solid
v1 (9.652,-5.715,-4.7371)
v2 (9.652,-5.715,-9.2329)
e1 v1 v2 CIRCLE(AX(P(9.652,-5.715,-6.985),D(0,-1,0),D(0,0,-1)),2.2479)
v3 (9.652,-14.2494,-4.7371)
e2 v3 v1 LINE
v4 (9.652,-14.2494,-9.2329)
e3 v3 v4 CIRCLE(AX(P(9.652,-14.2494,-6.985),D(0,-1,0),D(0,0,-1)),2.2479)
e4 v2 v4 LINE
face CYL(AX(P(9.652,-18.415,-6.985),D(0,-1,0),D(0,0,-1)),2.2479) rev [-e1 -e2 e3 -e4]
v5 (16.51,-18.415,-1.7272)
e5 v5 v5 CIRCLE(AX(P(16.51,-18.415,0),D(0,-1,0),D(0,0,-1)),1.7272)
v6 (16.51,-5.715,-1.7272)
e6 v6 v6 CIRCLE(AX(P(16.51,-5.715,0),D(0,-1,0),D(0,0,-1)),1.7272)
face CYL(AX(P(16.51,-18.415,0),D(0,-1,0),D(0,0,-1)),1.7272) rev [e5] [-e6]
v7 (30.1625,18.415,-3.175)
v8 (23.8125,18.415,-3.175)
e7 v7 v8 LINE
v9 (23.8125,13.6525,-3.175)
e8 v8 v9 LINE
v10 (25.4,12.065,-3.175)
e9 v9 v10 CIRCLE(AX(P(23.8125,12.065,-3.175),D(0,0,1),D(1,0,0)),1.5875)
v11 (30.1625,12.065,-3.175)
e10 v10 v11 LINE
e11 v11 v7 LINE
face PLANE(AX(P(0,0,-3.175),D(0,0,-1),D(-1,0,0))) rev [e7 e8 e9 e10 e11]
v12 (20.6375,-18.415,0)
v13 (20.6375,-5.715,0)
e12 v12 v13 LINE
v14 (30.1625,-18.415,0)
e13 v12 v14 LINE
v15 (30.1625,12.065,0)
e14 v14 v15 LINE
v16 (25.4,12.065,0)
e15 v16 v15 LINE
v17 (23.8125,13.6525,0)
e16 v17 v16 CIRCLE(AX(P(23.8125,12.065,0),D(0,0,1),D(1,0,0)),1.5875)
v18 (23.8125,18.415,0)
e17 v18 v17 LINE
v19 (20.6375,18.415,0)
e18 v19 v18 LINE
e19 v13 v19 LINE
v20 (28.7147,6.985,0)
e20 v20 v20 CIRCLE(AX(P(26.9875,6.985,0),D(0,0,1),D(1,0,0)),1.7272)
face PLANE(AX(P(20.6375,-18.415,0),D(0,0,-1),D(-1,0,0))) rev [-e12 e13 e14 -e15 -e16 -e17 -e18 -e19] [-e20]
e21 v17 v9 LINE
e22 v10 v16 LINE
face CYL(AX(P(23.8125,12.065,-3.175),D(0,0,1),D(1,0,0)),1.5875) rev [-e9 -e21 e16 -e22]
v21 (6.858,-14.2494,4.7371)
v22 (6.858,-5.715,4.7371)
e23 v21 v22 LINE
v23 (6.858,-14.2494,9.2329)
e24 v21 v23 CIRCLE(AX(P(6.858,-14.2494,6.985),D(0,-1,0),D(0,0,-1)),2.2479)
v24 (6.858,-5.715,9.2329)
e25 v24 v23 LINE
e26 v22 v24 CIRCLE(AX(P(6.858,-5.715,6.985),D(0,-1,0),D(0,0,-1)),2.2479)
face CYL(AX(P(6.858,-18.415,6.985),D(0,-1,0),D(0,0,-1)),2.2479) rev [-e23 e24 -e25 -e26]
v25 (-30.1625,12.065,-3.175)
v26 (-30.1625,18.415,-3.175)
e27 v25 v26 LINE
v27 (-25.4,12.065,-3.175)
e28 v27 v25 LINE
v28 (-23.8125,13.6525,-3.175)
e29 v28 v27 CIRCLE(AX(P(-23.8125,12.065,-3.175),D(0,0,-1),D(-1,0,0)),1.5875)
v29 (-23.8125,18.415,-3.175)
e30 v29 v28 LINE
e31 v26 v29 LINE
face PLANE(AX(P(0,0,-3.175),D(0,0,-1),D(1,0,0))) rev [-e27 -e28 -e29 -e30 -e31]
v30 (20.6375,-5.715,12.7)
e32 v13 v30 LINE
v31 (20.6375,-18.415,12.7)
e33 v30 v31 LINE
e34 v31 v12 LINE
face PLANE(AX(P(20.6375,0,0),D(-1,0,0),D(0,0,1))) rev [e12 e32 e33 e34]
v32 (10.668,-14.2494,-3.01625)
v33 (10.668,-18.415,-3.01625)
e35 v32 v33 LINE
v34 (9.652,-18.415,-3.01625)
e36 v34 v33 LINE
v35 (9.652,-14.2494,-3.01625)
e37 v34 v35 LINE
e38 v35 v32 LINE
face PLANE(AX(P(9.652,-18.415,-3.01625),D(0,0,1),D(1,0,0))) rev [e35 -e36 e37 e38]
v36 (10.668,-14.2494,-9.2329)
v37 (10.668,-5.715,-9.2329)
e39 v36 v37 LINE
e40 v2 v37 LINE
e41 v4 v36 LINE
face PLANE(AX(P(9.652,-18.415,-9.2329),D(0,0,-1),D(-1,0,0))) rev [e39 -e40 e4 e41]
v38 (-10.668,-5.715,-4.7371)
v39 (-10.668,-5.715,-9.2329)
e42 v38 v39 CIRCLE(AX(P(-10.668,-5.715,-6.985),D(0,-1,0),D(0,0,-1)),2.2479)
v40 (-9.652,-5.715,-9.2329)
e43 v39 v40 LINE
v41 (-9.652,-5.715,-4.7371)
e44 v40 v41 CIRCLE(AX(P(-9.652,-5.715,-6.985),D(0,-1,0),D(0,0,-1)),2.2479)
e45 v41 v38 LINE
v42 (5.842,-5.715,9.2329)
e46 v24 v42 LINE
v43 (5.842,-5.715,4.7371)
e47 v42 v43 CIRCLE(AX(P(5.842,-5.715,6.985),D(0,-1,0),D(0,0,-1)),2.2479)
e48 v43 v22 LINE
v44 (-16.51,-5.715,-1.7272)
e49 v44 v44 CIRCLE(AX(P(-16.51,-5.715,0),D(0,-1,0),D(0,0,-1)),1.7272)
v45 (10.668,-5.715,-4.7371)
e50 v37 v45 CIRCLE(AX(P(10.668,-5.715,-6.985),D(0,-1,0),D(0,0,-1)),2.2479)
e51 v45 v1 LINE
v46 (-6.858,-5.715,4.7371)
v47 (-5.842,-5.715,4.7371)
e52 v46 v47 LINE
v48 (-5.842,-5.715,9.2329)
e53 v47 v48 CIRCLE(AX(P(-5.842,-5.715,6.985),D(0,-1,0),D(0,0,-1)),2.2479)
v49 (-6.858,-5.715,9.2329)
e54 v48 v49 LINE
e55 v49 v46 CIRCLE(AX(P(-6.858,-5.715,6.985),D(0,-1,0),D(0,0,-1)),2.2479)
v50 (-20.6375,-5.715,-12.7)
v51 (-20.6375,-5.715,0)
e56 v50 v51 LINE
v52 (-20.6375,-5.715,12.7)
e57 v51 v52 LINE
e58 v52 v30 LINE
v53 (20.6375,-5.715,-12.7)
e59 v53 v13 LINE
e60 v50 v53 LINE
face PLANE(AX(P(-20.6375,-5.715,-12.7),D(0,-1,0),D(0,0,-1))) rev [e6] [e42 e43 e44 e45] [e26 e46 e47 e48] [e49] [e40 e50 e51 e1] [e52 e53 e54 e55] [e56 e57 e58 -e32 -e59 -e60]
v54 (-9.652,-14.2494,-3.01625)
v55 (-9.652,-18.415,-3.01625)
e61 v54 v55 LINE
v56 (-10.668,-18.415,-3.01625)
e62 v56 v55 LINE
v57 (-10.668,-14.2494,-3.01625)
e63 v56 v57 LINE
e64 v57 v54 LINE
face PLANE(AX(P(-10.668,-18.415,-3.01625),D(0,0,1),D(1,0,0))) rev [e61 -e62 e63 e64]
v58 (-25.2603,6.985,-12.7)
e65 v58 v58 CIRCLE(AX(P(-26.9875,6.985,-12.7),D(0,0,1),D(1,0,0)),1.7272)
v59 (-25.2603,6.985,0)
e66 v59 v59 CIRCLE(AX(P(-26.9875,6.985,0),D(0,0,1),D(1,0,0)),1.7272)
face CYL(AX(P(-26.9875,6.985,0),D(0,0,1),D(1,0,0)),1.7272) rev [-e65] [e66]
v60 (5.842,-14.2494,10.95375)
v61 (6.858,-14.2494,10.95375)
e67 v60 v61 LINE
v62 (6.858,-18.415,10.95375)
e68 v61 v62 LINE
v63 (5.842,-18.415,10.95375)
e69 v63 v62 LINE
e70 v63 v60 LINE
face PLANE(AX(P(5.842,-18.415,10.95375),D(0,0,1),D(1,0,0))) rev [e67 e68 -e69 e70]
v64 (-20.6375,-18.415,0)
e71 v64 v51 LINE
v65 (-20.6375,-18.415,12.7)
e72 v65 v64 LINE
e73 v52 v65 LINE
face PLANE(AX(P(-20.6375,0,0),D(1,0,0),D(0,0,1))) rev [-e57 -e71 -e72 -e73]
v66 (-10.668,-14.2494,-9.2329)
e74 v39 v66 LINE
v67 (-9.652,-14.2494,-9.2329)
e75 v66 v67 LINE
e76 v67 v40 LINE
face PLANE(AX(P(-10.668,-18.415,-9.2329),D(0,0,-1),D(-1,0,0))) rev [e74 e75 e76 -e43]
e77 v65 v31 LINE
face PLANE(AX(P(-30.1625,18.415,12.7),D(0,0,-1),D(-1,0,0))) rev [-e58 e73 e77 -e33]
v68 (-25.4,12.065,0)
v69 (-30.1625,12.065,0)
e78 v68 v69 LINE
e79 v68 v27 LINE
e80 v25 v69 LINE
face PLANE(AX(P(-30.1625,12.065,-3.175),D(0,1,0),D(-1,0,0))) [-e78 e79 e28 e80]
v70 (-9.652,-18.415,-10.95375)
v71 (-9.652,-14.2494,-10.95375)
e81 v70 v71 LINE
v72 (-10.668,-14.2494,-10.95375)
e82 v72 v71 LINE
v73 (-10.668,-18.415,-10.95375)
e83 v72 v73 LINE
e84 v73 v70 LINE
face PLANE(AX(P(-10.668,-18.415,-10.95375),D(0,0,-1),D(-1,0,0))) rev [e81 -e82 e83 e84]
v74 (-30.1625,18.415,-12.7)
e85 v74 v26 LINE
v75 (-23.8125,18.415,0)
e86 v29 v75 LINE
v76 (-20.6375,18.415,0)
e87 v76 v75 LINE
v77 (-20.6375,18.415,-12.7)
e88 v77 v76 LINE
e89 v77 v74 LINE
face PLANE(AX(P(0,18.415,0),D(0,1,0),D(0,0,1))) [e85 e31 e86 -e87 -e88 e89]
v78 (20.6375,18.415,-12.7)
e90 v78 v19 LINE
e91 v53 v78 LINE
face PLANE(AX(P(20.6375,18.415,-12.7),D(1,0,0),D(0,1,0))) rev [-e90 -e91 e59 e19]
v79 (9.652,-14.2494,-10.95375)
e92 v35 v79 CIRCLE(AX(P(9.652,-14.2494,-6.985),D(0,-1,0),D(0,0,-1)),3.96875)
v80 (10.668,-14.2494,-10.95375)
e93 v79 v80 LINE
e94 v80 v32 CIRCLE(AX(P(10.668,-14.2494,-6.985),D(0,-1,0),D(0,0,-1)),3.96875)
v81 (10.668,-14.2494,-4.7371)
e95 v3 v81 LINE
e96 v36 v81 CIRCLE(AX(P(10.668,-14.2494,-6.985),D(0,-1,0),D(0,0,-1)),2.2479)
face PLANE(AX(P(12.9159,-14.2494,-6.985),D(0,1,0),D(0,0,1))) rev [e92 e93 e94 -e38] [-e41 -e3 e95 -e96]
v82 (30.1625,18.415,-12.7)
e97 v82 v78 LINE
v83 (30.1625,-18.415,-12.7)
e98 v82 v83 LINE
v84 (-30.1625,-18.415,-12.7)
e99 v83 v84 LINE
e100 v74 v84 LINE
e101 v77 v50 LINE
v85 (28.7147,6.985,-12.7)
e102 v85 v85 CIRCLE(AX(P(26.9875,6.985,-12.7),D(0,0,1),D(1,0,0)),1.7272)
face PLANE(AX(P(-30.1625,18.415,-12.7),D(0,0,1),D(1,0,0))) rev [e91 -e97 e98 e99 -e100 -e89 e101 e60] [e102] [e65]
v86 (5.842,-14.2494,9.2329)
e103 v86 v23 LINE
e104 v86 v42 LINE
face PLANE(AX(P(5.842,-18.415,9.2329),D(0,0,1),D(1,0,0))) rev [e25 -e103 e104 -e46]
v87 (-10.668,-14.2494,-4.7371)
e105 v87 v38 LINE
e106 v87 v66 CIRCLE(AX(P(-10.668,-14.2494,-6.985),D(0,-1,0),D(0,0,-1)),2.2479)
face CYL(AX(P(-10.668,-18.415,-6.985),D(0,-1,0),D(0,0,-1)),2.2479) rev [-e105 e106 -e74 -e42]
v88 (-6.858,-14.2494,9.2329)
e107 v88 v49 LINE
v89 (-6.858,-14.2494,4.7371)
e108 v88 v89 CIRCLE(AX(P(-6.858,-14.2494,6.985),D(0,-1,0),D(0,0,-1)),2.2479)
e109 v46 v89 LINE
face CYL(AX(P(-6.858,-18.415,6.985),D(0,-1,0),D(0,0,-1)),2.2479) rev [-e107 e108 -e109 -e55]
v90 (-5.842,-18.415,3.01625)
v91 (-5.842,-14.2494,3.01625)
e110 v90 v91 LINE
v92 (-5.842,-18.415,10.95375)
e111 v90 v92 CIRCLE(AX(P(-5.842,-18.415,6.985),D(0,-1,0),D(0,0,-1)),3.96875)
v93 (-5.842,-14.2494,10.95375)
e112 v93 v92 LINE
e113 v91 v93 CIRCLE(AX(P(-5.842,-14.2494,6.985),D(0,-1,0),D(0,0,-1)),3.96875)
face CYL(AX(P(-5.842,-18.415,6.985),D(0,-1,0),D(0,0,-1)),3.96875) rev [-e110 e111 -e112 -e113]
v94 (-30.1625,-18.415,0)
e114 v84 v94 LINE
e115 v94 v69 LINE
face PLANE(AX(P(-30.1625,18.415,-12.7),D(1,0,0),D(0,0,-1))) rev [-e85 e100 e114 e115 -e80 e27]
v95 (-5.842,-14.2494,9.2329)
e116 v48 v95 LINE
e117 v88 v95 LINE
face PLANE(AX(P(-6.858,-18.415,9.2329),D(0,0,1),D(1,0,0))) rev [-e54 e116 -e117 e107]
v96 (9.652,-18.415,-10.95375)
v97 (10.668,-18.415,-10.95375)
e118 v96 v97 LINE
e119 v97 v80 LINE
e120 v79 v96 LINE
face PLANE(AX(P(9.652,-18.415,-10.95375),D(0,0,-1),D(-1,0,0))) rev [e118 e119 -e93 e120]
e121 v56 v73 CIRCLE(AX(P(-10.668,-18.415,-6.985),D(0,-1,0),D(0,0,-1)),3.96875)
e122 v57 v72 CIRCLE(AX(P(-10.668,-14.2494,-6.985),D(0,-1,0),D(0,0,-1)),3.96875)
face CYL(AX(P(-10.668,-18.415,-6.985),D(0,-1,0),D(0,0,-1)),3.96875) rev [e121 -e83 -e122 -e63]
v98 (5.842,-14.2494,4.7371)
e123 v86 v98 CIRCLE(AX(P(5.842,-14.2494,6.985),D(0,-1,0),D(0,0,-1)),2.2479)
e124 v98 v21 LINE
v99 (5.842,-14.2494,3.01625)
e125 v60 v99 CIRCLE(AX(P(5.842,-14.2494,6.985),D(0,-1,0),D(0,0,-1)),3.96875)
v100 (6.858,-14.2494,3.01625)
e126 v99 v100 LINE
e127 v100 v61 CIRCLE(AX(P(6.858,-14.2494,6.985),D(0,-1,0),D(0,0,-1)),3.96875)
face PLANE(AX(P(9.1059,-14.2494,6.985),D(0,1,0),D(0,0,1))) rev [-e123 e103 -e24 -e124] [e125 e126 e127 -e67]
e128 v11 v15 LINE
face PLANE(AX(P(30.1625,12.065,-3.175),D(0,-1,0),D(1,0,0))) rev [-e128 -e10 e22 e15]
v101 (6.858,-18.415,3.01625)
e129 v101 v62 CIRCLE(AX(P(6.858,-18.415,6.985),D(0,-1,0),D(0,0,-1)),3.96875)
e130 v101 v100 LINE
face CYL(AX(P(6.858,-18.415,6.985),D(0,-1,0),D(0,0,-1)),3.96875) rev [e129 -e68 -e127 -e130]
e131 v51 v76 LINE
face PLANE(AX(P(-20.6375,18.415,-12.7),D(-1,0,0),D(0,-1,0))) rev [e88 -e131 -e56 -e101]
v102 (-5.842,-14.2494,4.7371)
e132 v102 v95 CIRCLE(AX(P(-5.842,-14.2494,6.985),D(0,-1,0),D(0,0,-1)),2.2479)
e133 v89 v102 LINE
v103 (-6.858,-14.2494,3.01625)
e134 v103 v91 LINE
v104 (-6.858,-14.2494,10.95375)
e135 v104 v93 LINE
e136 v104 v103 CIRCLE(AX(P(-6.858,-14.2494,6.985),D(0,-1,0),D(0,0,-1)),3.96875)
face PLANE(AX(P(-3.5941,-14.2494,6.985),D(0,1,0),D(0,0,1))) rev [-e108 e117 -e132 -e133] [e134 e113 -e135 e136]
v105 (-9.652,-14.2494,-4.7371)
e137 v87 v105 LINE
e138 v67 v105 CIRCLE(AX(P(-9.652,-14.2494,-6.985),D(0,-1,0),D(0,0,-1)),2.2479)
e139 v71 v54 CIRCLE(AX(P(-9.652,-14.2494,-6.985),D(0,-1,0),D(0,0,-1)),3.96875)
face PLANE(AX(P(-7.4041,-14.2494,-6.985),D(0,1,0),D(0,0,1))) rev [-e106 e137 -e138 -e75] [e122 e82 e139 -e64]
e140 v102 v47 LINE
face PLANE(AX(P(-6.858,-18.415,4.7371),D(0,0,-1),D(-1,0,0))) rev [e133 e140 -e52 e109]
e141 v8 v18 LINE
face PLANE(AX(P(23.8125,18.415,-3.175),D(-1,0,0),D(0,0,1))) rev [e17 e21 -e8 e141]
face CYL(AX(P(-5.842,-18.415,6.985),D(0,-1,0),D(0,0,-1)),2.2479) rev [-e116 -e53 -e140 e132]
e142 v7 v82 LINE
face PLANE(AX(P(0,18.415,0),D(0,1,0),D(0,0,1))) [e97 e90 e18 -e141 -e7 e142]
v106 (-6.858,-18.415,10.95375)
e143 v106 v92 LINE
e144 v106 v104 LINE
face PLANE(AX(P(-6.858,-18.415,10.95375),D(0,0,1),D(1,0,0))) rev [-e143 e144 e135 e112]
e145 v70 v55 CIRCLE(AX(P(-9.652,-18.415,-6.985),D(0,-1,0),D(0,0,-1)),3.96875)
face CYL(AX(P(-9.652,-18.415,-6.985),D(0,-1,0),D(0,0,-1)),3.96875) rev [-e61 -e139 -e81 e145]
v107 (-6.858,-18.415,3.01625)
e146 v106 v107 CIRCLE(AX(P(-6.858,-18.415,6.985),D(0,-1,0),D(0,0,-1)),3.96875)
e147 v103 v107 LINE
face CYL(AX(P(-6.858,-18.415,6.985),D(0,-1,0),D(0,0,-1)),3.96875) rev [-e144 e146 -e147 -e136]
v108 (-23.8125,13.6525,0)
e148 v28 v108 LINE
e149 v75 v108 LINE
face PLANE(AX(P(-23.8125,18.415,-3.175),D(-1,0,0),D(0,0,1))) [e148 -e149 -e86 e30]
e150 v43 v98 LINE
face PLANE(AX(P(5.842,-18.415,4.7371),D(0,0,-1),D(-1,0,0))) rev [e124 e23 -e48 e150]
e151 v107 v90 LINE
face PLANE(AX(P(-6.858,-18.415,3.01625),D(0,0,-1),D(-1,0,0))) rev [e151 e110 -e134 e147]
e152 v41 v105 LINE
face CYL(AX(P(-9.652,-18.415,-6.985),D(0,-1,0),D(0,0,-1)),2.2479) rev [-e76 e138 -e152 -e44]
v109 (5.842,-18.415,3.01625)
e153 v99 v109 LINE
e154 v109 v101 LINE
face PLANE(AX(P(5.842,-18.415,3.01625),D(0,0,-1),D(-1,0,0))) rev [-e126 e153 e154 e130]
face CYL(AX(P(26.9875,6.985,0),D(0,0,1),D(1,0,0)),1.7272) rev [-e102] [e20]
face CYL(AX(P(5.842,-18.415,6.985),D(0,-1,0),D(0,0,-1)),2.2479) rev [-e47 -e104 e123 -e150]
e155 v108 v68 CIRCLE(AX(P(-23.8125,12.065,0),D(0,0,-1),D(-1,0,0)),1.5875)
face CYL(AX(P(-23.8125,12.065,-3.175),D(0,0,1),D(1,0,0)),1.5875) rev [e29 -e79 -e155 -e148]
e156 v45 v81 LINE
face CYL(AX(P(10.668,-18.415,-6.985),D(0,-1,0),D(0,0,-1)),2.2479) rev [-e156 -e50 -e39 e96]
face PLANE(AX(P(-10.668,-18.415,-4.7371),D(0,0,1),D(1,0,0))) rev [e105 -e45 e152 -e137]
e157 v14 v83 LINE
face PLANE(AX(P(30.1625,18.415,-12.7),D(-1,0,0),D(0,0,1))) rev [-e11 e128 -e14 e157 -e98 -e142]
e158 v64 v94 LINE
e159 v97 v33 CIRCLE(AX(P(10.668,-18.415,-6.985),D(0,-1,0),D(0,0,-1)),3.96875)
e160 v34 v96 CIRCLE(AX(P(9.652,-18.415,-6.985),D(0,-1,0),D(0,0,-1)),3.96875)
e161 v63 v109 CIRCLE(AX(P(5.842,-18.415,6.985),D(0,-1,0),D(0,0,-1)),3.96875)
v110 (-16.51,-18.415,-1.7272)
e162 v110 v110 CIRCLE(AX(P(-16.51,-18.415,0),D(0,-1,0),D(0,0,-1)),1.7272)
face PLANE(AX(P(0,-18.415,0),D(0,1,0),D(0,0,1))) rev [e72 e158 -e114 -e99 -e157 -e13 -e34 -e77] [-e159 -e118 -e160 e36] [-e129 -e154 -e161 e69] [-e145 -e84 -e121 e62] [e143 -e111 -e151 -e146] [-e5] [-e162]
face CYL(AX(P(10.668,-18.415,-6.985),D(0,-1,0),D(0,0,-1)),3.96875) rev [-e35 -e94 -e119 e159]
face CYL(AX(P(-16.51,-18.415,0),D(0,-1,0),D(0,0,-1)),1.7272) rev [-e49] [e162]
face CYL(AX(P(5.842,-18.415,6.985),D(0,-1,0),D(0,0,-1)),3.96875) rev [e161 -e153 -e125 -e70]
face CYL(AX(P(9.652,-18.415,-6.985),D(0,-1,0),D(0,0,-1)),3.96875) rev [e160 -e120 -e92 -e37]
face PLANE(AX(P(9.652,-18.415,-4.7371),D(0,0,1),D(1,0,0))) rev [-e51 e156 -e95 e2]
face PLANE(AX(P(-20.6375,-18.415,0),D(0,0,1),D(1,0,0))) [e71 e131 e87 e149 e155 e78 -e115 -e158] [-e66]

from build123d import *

# Parameters (mm, degrees)
SKETCH1_W                                     = 60.325
SKETCH1_H                                     = 25.4
BOSS_EXTRUDE1_DEPTH                           = 18.415
SKETCH2_W                                     = 41.275
SKETCH2_H                                     = 24.13
CUT_EXTRUDE1_DEPTH                            = 44.520669012
SKETCH3_W                                     = 12.7
SKETCH3_H                                     = 36.83
CUT_EXTRUDE2_DEPTH                            = 9.525
SKETCH4_W                                     = 6.35
SKETCH4_H                                     = 6.35
CUT_EXTRUDE3_DEPTH                            = 3.175
SKETCH5_R                                     = 1.5875
CUT_EXTRUDE4_DEPTH                            = 3.175
F_8_32_TAPPED_HOLE1_D                         = 3.4544
F_8_32_TAPPED_HOLE2_D                         = 3.4544
CBORE_START                                   = -18.415
CBORE_SLOT_FOR_8_SOCKET_HEAD_CAP_SCREW1_DEPTH = 12.7
CBORE_SLOT_FOR_8_SOCKET_HEAD_CAP_SC_3_DEPTH   = 4.1656


# Read off the part's stored shape, not the designer's step: CBORE SLOT for #8 Socket Head Cap Screw1
with BuildPart() as part:
    # Sketch1 → Boss-Extrude1 (new, symmetric)
    with BuildSketch(Plane(origin=(0, 0, 0), x_dir=(1, 0, 0), z_dir=(0, 1, 0))):
        Rectangle(SKETCH1_W, SKETCH1_H)
    extrude(amount=BOSS_EXTRUDE1_DEPTH, both=True)

    # Sketch2 → Cut-Extrude1 (cut, through all)
    with BuildSketch(Plane.XY.offset(12.7)):
        with Locations((0, 6.35)):
            Rectangle(SKETCH2_W, SKETCH2_H)
    extrude(amount=-CUT_EXTRUDE1_DEPTH, mode=Mode.SUBTRACT)

    # Sketch3 → Cut-Extrude2 (cut)
    with BuildSketch(Plane(origin=(30.1625, 0, 0), x_dir=(0, 0, -1), z_dir=(1, 0, 0))):
        with Locations((-6.35, 0)):
            Rectangle(SKETCH3_W, SKETCH3_H)
    cut_extrude2 = extrude(amount=-CUT_EXTRUDE2_DEPTH, mode=Mode.SUBTRACT)

    # Sketch4 → Cut-Extrude3 (cut)
    with BuildSketch(Plane.XY):
        with Locations((26.9875, 15.24)):
            Rectangle(SKETCH4_W, SKETCH4_H)
    cut_extrude3 = extrude(amount=-CUT_EXTRUDE3_DEPTH, mode=Mode.SUBTRACT)

    # Sketch5 → Cut-Extrude4 (cut)
    with BuildSketch(Plane.XY):
        with Locations((23.8125, 12.065)):
            Circle(SKETCH5_R)
    cut_extrude4 = extrude(amount=-CUT_EXTRUDE4_DEPTH, mode=Mode.SUBTRACT)

    # #8-32 Tapped Hole1 (through all)
    with Locations(Plane.XY):
        with Locations((26.9875, 6.985)):
            f_8_32_tapped_hole1 = Hole(F_8_32_TAPPED_HOLE1_D / 2)

    # Mirror1: Cut-Extrude2, Cut-Extrude3, Cut-Extrude4, #8-32 Tapped Hole1 across plane
    add(cut_extrude2.mirror(Plane(origin=(0, 0, 0), x_dir=(0, 0, 1), z_dir=(1, 0, 0))), mode=Mode.SUBTRACT)
    add(cut_extrude3.mirror(Plane(origin=(0, 0, 0), x_dir=(0, 0, 1), z_dir=(1, 0, 0))), mode=Mode.SUBTRACT)
    add(cut_extrude4.mirror(Plane(origin=(0, 0, 0), x_dir=(0, 0, 1), z_dir=(1, 0, 0))), mode=Mode.SUBTRACT)
    add(f_8_32_tapped_hole1.mirror(Plane(origin=(0, 0, 0), x_dir=(0, 0, 1), z_dir=(1, 0, 0))), mode=Mode.SUBTRACT)

    # #8-32 Tapped Hole2 (through all)
    with Locations(Plane(origin=(0, -18.415, 0), x_dir=(-1, 0, 0), z_dir=(0, -1, 0))):
        with Locations((16.51, 0)):
            f_8_32_tapped_hole2 = Hole(F_8_32_TAPPED_HOLE2_D / 2)

    # CBORE SLOT for _8 Socket Head Cap Sc 2 → CBORE SLOT for #8 Socket Head Cap Screw1 (cut)
    with BuildSketch(Plane(origin=(0, 0, 0), x_dir=(1, 0, 0), z_dir=(0, 1, 0)).offset(CBORE_START)):
        with BuildLine():
            ThreePointArc((-9.652, 4.7371), (-7.4041, 6.985), (-9.652, 9.2329))
            Line((-9.652, 9.2329), (-10.668, 9.2329))
            ThreePointArc((-10.668, 9.2329), (-12.9159, 6.985), (-10.668, 4.7371))
            Line((-10.668, 4.7371), (-9.652, 4.7371))
        make_face()
        with BuildLine():
            ThreePointArc((9.652, 9.2329), (7.4041, 6.985), (9.652, 4.7371))
            Line((9.652, 4.7371), (10.668, 4.7371))
            ThreePointArc((10.668, 4.7371), (12.9159, 6.985), (10.668, 9.2329))
            Line((10.668, 9.2329), (9.652, 9.2329))
        make_face()
        with BuildLine():
            ThreePointArc((6.858, -9.2329), (9.1059, -6.985), (6.858, -4.7371))
            Line((6.858, -4.7371), (5.842, -4.7371))
            ThreePointArc((5.842, -4.7371), (3.5941, -6.985), (5.842, -9.2329))
            Line((5.842, -9.2329), (6.858, -9.2329))
        make_face()
        with BuildLine():
            ThreePointArc((-6.858, -4.7371), (-9.1059, -6.985), (-6.858, -9.2329))
            Line((-6.858, -9.2329), (-5.842, -9.2329))
            ThreePointArc((-5.842, -9.2329), (-3.5941, -6.985), (-5.842, -4.7371))
            Line((-5.842, -4.7371), (-6.858, -4.7371))
        make_face()
    extrude(amount=CBORE_SLOT_FOR_8_SOCKET_HEAD_CAP_SCREW1_DEPTH, mode=Mode.SUBTRACT)

    # CBORE SLOT for _8 Socket Head Cap Sc 3 o → CBORE SLOT for _8 Socket Head Cap Sc 3 (cut)
    # profile 1 of 4: a face of its own
    with BuildSketch(Plane(origin=(0, 0, 0), x_dir=(1, 0, 0), z_dir=(0, 1, 0)).offset(CBORE_START)):
        with BuildLine():
            ThreePointArc((-9.652, 3.01625), (-5.68325, 6.985), (-9.652, 10.95375))
            Line((-9.652, 10.95375), (-10.668, 10.95375))
            ThreePointArc((-10.668, 10.95375), (-14.63675, 6.985), (-10.668, 3.01625))
            Line((-10.668, 3.01625), (-9.652, 3.01625))
        make_face()
        with BuildLine():
            Line((-10.668, 9.2329), (-9.652, 9.2329))
            ThreePointArc((-9.652, 9.2329), (-7.4041, 6.985), (-9.652, 4.7371))
            Line((-9.652, 4.7371), (-10.668, 4.7371))
            ThreePointArc((-10.668, 4.7371), (-12.9159, 6.985), (-10.668, 9.2329))
        make_face(mode=Mode.SUBTRACT)
    # profile 2 of 4: a face of its own
    with BuildSketch(Plane(origin=(0, 0, 0), x_dir=(1, 0, 0), z_dir=(0, 1, 0)).offset(CBORE_START)):
        with BuildLine():
            ThreePointArc((9.652, 10.95375), (5.68325, 6.985), (9.652, 3.01625))
            Line((9.652, 3.01625), (10.668, 3.01625))
            ThreePointArc((10.668, 3.01625), (14.63675, 6.985), (10.668, 10.95375))
            Line((10.668, 10.95375), (9.652, 10.95375))
        make_face()
        with BuildLine():
            Line((10.668, 4.7371), (9.652, 4.7371))
            ThreePointArc((9.652, 4.7371), (7.4041, 6.985), (9.652, 9.2329))
            Line((9.652, 9.2329), (10.668, 9.2329))
            ThreePointArc((10.668, 9.2329), (12.9159, 6.985), (10.668, 4.7371))
        make_face(mode=Mode.SUBTRACT)
    # profile 3 of 4: a face of its own
    with BuildSketch(Plane(origin=(0, 0, 0), x_dir=(1, 0, 0), z_dir=(0, 1, 0)).offset(CBORE_START)):
        with BuildLine():
            ThreePointArc((6.858, -10.95375), (10.82675, -6.985), (6.858, -3.01625))
            Line((6.858, -3.01625), (5.842, -3.01625))
            ThreePointArc((5.842, -3.01625), (1.87325, -6.985), (5.842, -10.95375))
            Line((5.842, -10.95375), (6.858, -10.95375))
        make_face()
        with BuildLine():
            Line((5.842, -4.7371), (6.858, -4.7371))
            ThreePointArc((6.858, -4.7371), (9.1059, -6.985), (6.858, -9.2329))
            Line((6.858, -9.2329), (5.842, -9.2329))
            ThreePointArc((5.842, -9.2329), (3.5941, -6.985), (5.842, -4.7371))
        make_face(mode=Mode.SUBTRACT)
    # profile 4 of 4: a face of its own
    with BuildSketch(Plane(origin=(0, 0, 0), x_dir=(1, 0, 0), z_dir=(0, 1, 0)).offset(CBORE_START)):
        with BuildLine():
            ThreePointArc((-6.858, -3.01625), (-10.82675, -6.985), (-6.858, -10.95375))
            Line((-6.858, -10.95375), (-5.842, -10.95375))
            ThreePointArc((-5.842, -10.95375), (-1.87325, -6.985), (-5.842, -3.01625))
            Line((-5.842, -3.01625), (-6.858, -3.01625))
        make_face()
        with BuildLine():
            Line((-5.842, -9.2329), (-6.858, -9.2329))
            ThreePointArc((-6.858, -9.2329), (-9.1059, -6.985), (-6.858, -4.7371))
            Line((-6.858, -4.7371), (-5.842, -4.7371))
            ThreePointArc((-5.842, -4.7371), (-3.5941, -6.985), (-5.842, -9.2329))
        make_face(mode=Mode.SUBTRACT)
    extrude(amount=CBORE_SLOT_FOR_8_SOCKET_HEAD_CAP_SC_3_DEPTH, mode=Mode.SUBTRACT)

    # Mirror2: #8-32 Tapped Hole2 across plane
    add(f_8_32_tapped_hole2.mirror(Plane(origin=(0, 0, 0), x_dir=(0, 0, 1), z_dir=(1, 0, 0))), mode=Mode.SUBTRACT)


solid = part.part
